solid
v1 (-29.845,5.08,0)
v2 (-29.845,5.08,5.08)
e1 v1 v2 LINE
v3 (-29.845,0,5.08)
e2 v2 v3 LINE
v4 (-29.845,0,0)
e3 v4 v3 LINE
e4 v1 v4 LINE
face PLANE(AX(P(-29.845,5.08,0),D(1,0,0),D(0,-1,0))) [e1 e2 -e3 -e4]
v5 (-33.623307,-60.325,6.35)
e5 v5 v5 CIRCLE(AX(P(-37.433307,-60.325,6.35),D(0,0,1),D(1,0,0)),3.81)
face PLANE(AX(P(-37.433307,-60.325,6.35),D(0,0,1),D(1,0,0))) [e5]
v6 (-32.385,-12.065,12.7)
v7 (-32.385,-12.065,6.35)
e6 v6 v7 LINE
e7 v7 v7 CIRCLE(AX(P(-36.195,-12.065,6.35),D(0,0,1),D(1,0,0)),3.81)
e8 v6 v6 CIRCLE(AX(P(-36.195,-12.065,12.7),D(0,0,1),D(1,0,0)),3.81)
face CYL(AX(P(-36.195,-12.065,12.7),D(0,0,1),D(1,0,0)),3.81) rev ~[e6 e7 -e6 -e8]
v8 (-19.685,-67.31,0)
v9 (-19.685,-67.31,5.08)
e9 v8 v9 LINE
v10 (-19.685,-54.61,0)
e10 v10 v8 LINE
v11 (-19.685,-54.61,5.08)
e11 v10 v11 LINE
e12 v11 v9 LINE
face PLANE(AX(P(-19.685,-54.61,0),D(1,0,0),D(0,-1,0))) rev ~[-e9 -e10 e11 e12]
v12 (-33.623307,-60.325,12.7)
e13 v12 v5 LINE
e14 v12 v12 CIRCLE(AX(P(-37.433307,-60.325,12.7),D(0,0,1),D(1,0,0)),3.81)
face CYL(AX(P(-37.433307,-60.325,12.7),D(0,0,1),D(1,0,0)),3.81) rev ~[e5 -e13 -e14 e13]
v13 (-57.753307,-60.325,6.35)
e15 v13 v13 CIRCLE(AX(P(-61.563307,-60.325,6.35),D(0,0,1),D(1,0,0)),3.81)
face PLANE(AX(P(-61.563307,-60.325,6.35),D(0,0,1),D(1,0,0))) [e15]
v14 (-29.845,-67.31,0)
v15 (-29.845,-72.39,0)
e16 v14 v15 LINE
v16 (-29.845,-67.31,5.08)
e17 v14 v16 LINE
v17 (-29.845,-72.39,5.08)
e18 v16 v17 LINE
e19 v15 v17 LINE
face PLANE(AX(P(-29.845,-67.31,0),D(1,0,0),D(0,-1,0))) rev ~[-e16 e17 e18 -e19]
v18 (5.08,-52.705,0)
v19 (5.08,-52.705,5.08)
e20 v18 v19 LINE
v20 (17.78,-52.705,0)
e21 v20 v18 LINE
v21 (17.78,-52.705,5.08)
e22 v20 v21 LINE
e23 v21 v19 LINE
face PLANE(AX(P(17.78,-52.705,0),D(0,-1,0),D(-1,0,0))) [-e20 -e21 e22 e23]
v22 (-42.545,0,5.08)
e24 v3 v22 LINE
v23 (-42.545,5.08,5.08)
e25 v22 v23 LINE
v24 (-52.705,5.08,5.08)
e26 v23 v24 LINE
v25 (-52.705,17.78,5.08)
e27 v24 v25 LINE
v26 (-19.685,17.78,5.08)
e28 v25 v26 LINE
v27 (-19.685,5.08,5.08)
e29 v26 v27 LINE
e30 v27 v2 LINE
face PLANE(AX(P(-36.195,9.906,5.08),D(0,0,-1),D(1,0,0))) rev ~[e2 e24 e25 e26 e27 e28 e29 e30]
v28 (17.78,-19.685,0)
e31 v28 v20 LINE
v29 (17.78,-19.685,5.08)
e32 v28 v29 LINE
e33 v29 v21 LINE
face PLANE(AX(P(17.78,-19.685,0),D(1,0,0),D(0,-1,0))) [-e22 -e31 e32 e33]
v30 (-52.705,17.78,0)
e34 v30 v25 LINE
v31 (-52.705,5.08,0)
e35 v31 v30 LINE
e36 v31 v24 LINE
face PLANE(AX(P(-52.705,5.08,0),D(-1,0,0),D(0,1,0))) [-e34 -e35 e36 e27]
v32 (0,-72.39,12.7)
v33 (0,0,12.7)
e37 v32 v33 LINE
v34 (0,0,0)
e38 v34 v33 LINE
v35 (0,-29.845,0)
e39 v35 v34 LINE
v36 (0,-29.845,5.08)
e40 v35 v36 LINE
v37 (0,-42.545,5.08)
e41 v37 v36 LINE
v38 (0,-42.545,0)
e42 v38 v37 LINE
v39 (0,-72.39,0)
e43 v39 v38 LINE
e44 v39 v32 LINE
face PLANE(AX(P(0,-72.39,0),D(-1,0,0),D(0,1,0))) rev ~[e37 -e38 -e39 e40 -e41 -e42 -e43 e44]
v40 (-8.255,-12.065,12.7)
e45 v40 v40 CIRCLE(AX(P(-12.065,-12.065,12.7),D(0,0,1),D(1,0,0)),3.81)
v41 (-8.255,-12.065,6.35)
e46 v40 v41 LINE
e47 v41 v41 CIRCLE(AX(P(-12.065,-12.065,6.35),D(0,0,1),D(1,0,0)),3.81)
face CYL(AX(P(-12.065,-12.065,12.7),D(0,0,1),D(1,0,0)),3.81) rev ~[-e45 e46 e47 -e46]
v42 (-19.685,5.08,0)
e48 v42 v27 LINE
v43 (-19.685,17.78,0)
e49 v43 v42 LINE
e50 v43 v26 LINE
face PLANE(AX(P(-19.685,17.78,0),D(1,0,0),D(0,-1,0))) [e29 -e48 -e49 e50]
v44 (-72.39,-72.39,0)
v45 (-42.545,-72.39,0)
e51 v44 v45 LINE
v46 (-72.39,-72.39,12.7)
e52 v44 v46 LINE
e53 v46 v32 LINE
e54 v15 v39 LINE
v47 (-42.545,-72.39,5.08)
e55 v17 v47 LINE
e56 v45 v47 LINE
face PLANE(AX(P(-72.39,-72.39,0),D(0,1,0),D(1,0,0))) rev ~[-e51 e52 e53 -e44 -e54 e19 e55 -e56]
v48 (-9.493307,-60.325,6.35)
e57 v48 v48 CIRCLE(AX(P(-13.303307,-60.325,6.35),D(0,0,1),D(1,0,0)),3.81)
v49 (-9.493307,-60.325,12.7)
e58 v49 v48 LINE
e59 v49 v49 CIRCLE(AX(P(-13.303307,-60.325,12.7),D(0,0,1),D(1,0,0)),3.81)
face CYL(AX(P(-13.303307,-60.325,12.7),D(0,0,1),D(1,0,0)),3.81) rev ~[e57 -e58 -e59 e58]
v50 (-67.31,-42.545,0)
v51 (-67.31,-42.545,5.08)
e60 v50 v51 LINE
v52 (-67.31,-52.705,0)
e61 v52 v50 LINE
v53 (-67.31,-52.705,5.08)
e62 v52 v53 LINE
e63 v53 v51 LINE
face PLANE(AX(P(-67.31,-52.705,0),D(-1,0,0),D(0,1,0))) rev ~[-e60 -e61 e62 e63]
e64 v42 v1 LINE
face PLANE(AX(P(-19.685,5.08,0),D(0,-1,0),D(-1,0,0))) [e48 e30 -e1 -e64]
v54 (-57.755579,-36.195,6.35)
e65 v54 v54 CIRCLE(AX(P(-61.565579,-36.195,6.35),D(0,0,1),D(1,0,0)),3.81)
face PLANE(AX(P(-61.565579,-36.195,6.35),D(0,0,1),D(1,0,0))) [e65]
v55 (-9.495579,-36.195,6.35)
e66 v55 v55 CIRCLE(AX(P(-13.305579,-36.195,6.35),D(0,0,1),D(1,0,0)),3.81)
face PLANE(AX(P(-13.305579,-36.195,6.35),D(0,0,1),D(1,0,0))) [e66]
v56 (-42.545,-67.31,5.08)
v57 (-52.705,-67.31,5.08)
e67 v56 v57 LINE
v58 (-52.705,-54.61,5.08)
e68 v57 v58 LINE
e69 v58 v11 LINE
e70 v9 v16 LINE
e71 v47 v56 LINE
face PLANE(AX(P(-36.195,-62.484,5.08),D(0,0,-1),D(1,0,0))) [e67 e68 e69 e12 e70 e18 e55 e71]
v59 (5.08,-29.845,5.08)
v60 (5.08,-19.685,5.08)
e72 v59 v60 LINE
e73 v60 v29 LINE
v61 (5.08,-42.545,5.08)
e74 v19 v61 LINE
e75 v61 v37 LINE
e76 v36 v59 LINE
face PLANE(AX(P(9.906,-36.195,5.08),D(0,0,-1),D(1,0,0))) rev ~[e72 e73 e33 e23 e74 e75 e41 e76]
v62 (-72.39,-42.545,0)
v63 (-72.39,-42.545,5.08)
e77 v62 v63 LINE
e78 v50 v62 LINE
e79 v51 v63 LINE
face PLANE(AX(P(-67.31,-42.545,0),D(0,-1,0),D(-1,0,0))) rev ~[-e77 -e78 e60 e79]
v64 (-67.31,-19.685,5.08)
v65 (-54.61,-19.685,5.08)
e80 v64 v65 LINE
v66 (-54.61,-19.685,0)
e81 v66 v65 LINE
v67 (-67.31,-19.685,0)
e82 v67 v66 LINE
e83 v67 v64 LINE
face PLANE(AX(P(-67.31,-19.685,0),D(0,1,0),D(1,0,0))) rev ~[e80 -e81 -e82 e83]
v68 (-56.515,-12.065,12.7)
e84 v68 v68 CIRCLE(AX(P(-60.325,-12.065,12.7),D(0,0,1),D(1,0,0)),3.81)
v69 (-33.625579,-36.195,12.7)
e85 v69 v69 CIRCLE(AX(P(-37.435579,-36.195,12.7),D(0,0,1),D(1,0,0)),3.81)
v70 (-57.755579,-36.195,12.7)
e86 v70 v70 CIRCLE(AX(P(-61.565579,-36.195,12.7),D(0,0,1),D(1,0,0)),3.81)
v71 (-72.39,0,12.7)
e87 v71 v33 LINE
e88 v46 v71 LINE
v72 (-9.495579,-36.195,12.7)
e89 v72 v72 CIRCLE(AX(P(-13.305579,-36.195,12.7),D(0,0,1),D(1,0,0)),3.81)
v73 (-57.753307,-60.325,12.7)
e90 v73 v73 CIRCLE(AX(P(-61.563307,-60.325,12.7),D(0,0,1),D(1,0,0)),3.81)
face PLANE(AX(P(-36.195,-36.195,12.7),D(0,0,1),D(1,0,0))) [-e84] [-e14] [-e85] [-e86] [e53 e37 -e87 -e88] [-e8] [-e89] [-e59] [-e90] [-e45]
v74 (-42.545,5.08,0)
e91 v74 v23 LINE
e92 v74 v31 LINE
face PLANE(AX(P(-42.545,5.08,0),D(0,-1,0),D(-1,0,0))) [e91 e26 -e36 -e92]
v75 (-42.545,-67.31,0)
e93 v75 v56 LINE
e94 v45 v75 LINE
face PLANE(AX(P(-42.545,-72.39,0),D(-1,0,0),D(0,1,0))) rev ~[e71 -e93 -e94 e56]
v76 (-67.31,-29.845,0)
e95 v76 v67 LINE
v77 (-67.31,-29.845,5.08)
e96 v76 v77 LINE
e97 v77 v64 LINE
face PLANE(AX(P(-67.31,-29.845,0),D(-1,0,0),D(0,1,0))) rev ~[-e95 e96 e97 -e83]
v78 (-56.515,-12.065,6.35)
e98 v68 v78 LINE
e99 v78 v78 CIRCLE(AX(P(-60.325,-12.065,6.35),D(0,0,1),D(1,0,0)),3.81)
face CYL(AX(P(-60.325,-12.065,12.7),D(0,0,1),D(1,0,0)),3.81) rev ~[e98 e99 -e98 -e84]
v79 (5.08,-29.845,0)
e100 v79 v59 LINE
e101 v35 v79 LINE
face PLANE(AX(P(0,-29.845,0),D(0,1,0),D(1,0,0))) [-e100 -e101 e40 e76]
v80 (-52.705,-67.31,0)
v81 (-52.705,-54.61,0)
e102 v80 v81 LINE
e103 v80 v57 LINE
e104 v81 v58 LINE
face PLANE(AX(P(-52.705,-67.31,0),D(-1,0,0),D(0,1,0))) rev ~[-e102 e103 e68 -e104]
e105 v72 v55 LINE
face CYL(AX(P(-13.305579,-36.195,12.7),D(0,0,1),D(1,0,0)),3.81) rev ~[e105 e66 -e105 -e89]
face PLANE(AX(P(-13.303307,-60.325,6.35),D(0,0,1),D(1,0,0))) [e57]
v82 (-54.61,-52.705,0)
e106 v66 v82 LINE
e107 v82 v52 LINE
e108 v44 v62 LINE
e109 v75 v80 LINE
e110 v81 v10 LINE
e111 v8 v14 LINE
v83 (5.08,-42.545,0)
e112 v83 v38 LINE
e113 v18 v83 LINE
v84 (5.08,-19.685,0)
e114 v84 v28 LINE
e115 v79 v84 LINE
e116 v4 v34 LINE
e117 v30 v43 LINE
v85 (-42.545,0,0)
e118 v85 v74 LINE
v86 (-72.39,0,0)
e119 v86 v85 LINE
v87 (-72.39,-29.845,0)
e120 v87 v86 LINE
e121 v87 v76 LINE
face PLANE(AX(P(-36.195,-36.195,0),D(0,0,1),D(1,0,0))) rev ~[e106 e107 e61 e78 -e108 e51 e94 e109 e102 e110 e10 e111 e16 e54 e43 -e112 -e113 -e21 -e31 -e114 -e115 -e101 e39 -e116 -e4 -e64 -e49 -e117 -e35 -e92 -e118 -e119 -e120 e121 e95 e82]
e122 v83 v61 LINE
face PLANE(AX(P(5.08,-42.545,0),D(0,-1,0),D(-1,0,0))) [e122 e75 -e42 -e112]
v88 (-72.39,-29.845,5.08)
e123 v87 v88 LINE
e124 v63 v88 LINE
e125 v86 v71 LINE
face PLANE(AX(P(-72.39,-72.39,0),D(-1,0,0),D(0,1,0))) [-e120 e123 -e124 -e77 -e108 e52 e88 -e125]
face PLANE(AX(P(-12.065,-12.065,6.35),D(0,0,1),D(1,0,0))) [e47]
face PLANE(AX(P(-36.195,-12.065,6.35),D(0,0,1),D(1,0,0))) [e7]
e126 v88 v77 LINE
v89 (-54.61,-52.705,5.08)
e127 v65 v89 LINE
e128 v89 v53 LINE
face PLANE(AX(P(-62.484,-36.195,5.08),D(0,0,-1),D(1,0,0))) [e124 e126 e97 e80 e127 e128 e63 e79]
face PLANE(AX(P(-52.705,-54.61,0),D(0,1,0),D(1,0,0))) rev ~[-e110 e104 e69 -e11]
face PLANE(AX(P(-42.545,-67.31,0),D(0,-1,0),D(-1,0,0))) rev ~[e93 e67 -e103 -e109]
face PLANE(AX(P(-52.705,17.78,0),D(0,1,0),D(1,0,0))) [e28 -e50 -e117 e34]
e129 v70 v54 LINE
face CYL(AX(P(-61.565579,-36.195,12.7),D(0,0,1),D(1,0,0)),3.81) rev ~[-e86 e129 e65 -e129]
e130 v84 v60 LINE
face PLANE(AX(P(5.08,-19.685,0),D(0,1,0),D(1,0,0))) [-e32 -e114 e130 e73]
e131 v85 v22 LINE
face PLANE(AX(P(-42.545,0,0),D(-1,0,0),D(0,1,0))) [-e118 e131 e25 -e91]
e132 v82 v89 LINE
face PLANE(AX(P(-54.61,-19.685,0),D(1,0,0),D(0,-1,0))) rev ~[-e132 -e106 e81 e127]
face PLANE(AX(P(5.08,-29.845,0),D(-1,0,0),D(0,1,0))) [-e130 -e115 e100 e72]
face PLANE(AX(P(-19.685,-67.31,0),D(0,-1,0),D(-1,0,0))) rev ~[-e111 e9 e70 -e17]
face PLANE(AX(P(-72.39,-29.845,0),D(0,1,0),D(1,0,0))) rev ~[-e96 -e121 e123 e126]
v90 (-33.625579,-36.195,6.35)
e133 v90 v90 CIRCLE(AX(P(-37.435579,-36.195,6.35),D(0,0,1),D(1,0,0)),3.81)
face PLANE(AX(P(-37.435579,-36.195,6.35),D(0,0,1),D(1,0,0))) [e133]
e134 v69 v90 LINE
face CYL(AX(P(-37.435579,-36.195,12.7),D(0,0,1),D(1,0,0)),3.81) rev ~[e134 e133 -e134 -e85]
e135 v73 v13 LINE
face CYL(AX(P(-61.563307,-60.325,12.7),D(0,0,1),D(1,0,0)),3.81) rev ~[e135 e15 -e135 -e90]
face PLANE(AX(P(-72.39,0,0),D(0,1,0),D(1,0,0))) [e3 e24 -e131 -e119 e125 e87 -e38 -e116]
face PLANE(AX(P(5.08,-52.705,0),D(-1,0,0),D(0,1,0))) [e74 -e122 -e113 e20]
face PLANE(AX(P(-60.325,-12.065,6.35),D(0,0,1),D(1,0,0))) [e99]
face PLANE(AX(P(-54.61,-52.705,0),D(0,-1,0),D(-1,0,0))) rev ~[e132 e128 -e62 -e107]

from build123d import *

# Parameters (mm, degrees)
F0_W     = 72.39
F0_H     = 72.39
F1_DEPTH = 12.7
F2_R     = 3.81
F3_DEPTH = 6.35
F5_DEPTH = 5.08
F7_DEPTH = 5.08
F8_W     = 4.1331201792
F8_H     = 7.04711047
F8_W_2   = 14.3668507226
F8_H_2   = 5.652282387
F9_DEPTH = 2.54


with BuildPart() as f1:
    # F0 (on Top) → F1 (new body)
    with BuildSketch(Plane.XY):
        with Locations((-36.195, -36.195)):
            Rectangle(F0_W, F0_H)
    extrude(amount=F1_DEPTH)

    # F2 (on face) → F3 (cut)
    with BuildSketch(Plane.XY.offset(12.7)):
        with Locations((-60.325, -12.065)):
            Circle(F2_R)
        with Locations((-61.5655786634, -36.195)):
            Circle(F2_R)
        with Locations((-61.5633073788, -60.325)):
            Circle(F2_R)
        with Locations((-36.195, -12.065)):
            Circle(F2_R)
        with Locations((-37.4355786634, -36.195)):
            Circle(F2_R)
        with Locations((-37.4333073788, -60.325)):
            Circle(F2_R)
        with Locations((-12.065, -12.065)):
            Circle(F2_R)
        with Locations((-13.3055786634, -36.195)):
            Circle(F2_R)
        with Locations((-13.3033073788, -60.325)):
            Circle(F2_R)
    extrude(amount=-F3_DEPTH, mode=Mode.SUBTRACT)

    # F4 (on face) → F5 (join)
    with BuildSketch(Plane(origin=(0, 0, 0), x_dir=(1, 0, 0), z_dir=(0, 0, -1))):
        Polygon((5.08, 42.545), (0, 42.545), (0, 29.845), (5.08, 29.845), (5.08, 19.685), (17.78, 19.685), (17.78, 52.705), (5.08, 52.705), align=None)
        Polygon((-29.845, -5.08), (-29.845, 0), (-42.545, 0), (-42.545, -5.08), (-52.705, -5.08), (-52.705, -17.78), (-19.685, -17.78), (-19.685, -5.08), align=None)
    extrude(amount=-F5_DEPTH)

    # F6 (on face) → F7 (cut)
    with BuildSketch(Plane(origin=(0, 0, 0), x_dir=(1, 0, 0), z_dir=(0, 0, -1))):
        Polygon((-44.1891504281, -29.484081471), (-56.8891504281, -29.484081471), (-56.8891504281, -42.184081471), (-44.1891504281, -42.184081471), (-44.1891504281, -54.884081471), (-31.4891504281, -54.884081471), (-31.4891504281, -17.78), (-44.1891504281, -17.78), align=None)
        Polygon((-72.39, 42.545), (-72.39, 29.845), (-67.31, 29.845), (-67.31, 19.685), (-54.61, 19.685), (-54.61, 52.705), (-67.31, 52.705), (-67.31, 42.545), align=None)
        Polygon((-29.845, 72.39), (-42.545, 72.39), (-42.545, 67.31), (-52.705, 67.31), (-52.705, 54.61), (-19.685, 54.61), (-19.685, 67.31), (-29.845, 67.31), align=None)
    extrude(amount=-F7_DEPTH, mode=Mode.SUBTRACT)

    # F8 (on face) → F9 (join)
    with BuildSketch(Plane(origin=(0, 0, 0), x_dir=(1, 0, 0), z_dir=(0, 0, -1))):
        with Locations((-36.4783331752, -0.2260982292)):
            Rectangle(F8_W, F8_H)
        with Locations((-3.0054978561, 35.1009014994)):
            Rectangle(F8_W_2, F8_H_2)
    extrude(amount=-F9_DEPTH)


solid = f1.part
